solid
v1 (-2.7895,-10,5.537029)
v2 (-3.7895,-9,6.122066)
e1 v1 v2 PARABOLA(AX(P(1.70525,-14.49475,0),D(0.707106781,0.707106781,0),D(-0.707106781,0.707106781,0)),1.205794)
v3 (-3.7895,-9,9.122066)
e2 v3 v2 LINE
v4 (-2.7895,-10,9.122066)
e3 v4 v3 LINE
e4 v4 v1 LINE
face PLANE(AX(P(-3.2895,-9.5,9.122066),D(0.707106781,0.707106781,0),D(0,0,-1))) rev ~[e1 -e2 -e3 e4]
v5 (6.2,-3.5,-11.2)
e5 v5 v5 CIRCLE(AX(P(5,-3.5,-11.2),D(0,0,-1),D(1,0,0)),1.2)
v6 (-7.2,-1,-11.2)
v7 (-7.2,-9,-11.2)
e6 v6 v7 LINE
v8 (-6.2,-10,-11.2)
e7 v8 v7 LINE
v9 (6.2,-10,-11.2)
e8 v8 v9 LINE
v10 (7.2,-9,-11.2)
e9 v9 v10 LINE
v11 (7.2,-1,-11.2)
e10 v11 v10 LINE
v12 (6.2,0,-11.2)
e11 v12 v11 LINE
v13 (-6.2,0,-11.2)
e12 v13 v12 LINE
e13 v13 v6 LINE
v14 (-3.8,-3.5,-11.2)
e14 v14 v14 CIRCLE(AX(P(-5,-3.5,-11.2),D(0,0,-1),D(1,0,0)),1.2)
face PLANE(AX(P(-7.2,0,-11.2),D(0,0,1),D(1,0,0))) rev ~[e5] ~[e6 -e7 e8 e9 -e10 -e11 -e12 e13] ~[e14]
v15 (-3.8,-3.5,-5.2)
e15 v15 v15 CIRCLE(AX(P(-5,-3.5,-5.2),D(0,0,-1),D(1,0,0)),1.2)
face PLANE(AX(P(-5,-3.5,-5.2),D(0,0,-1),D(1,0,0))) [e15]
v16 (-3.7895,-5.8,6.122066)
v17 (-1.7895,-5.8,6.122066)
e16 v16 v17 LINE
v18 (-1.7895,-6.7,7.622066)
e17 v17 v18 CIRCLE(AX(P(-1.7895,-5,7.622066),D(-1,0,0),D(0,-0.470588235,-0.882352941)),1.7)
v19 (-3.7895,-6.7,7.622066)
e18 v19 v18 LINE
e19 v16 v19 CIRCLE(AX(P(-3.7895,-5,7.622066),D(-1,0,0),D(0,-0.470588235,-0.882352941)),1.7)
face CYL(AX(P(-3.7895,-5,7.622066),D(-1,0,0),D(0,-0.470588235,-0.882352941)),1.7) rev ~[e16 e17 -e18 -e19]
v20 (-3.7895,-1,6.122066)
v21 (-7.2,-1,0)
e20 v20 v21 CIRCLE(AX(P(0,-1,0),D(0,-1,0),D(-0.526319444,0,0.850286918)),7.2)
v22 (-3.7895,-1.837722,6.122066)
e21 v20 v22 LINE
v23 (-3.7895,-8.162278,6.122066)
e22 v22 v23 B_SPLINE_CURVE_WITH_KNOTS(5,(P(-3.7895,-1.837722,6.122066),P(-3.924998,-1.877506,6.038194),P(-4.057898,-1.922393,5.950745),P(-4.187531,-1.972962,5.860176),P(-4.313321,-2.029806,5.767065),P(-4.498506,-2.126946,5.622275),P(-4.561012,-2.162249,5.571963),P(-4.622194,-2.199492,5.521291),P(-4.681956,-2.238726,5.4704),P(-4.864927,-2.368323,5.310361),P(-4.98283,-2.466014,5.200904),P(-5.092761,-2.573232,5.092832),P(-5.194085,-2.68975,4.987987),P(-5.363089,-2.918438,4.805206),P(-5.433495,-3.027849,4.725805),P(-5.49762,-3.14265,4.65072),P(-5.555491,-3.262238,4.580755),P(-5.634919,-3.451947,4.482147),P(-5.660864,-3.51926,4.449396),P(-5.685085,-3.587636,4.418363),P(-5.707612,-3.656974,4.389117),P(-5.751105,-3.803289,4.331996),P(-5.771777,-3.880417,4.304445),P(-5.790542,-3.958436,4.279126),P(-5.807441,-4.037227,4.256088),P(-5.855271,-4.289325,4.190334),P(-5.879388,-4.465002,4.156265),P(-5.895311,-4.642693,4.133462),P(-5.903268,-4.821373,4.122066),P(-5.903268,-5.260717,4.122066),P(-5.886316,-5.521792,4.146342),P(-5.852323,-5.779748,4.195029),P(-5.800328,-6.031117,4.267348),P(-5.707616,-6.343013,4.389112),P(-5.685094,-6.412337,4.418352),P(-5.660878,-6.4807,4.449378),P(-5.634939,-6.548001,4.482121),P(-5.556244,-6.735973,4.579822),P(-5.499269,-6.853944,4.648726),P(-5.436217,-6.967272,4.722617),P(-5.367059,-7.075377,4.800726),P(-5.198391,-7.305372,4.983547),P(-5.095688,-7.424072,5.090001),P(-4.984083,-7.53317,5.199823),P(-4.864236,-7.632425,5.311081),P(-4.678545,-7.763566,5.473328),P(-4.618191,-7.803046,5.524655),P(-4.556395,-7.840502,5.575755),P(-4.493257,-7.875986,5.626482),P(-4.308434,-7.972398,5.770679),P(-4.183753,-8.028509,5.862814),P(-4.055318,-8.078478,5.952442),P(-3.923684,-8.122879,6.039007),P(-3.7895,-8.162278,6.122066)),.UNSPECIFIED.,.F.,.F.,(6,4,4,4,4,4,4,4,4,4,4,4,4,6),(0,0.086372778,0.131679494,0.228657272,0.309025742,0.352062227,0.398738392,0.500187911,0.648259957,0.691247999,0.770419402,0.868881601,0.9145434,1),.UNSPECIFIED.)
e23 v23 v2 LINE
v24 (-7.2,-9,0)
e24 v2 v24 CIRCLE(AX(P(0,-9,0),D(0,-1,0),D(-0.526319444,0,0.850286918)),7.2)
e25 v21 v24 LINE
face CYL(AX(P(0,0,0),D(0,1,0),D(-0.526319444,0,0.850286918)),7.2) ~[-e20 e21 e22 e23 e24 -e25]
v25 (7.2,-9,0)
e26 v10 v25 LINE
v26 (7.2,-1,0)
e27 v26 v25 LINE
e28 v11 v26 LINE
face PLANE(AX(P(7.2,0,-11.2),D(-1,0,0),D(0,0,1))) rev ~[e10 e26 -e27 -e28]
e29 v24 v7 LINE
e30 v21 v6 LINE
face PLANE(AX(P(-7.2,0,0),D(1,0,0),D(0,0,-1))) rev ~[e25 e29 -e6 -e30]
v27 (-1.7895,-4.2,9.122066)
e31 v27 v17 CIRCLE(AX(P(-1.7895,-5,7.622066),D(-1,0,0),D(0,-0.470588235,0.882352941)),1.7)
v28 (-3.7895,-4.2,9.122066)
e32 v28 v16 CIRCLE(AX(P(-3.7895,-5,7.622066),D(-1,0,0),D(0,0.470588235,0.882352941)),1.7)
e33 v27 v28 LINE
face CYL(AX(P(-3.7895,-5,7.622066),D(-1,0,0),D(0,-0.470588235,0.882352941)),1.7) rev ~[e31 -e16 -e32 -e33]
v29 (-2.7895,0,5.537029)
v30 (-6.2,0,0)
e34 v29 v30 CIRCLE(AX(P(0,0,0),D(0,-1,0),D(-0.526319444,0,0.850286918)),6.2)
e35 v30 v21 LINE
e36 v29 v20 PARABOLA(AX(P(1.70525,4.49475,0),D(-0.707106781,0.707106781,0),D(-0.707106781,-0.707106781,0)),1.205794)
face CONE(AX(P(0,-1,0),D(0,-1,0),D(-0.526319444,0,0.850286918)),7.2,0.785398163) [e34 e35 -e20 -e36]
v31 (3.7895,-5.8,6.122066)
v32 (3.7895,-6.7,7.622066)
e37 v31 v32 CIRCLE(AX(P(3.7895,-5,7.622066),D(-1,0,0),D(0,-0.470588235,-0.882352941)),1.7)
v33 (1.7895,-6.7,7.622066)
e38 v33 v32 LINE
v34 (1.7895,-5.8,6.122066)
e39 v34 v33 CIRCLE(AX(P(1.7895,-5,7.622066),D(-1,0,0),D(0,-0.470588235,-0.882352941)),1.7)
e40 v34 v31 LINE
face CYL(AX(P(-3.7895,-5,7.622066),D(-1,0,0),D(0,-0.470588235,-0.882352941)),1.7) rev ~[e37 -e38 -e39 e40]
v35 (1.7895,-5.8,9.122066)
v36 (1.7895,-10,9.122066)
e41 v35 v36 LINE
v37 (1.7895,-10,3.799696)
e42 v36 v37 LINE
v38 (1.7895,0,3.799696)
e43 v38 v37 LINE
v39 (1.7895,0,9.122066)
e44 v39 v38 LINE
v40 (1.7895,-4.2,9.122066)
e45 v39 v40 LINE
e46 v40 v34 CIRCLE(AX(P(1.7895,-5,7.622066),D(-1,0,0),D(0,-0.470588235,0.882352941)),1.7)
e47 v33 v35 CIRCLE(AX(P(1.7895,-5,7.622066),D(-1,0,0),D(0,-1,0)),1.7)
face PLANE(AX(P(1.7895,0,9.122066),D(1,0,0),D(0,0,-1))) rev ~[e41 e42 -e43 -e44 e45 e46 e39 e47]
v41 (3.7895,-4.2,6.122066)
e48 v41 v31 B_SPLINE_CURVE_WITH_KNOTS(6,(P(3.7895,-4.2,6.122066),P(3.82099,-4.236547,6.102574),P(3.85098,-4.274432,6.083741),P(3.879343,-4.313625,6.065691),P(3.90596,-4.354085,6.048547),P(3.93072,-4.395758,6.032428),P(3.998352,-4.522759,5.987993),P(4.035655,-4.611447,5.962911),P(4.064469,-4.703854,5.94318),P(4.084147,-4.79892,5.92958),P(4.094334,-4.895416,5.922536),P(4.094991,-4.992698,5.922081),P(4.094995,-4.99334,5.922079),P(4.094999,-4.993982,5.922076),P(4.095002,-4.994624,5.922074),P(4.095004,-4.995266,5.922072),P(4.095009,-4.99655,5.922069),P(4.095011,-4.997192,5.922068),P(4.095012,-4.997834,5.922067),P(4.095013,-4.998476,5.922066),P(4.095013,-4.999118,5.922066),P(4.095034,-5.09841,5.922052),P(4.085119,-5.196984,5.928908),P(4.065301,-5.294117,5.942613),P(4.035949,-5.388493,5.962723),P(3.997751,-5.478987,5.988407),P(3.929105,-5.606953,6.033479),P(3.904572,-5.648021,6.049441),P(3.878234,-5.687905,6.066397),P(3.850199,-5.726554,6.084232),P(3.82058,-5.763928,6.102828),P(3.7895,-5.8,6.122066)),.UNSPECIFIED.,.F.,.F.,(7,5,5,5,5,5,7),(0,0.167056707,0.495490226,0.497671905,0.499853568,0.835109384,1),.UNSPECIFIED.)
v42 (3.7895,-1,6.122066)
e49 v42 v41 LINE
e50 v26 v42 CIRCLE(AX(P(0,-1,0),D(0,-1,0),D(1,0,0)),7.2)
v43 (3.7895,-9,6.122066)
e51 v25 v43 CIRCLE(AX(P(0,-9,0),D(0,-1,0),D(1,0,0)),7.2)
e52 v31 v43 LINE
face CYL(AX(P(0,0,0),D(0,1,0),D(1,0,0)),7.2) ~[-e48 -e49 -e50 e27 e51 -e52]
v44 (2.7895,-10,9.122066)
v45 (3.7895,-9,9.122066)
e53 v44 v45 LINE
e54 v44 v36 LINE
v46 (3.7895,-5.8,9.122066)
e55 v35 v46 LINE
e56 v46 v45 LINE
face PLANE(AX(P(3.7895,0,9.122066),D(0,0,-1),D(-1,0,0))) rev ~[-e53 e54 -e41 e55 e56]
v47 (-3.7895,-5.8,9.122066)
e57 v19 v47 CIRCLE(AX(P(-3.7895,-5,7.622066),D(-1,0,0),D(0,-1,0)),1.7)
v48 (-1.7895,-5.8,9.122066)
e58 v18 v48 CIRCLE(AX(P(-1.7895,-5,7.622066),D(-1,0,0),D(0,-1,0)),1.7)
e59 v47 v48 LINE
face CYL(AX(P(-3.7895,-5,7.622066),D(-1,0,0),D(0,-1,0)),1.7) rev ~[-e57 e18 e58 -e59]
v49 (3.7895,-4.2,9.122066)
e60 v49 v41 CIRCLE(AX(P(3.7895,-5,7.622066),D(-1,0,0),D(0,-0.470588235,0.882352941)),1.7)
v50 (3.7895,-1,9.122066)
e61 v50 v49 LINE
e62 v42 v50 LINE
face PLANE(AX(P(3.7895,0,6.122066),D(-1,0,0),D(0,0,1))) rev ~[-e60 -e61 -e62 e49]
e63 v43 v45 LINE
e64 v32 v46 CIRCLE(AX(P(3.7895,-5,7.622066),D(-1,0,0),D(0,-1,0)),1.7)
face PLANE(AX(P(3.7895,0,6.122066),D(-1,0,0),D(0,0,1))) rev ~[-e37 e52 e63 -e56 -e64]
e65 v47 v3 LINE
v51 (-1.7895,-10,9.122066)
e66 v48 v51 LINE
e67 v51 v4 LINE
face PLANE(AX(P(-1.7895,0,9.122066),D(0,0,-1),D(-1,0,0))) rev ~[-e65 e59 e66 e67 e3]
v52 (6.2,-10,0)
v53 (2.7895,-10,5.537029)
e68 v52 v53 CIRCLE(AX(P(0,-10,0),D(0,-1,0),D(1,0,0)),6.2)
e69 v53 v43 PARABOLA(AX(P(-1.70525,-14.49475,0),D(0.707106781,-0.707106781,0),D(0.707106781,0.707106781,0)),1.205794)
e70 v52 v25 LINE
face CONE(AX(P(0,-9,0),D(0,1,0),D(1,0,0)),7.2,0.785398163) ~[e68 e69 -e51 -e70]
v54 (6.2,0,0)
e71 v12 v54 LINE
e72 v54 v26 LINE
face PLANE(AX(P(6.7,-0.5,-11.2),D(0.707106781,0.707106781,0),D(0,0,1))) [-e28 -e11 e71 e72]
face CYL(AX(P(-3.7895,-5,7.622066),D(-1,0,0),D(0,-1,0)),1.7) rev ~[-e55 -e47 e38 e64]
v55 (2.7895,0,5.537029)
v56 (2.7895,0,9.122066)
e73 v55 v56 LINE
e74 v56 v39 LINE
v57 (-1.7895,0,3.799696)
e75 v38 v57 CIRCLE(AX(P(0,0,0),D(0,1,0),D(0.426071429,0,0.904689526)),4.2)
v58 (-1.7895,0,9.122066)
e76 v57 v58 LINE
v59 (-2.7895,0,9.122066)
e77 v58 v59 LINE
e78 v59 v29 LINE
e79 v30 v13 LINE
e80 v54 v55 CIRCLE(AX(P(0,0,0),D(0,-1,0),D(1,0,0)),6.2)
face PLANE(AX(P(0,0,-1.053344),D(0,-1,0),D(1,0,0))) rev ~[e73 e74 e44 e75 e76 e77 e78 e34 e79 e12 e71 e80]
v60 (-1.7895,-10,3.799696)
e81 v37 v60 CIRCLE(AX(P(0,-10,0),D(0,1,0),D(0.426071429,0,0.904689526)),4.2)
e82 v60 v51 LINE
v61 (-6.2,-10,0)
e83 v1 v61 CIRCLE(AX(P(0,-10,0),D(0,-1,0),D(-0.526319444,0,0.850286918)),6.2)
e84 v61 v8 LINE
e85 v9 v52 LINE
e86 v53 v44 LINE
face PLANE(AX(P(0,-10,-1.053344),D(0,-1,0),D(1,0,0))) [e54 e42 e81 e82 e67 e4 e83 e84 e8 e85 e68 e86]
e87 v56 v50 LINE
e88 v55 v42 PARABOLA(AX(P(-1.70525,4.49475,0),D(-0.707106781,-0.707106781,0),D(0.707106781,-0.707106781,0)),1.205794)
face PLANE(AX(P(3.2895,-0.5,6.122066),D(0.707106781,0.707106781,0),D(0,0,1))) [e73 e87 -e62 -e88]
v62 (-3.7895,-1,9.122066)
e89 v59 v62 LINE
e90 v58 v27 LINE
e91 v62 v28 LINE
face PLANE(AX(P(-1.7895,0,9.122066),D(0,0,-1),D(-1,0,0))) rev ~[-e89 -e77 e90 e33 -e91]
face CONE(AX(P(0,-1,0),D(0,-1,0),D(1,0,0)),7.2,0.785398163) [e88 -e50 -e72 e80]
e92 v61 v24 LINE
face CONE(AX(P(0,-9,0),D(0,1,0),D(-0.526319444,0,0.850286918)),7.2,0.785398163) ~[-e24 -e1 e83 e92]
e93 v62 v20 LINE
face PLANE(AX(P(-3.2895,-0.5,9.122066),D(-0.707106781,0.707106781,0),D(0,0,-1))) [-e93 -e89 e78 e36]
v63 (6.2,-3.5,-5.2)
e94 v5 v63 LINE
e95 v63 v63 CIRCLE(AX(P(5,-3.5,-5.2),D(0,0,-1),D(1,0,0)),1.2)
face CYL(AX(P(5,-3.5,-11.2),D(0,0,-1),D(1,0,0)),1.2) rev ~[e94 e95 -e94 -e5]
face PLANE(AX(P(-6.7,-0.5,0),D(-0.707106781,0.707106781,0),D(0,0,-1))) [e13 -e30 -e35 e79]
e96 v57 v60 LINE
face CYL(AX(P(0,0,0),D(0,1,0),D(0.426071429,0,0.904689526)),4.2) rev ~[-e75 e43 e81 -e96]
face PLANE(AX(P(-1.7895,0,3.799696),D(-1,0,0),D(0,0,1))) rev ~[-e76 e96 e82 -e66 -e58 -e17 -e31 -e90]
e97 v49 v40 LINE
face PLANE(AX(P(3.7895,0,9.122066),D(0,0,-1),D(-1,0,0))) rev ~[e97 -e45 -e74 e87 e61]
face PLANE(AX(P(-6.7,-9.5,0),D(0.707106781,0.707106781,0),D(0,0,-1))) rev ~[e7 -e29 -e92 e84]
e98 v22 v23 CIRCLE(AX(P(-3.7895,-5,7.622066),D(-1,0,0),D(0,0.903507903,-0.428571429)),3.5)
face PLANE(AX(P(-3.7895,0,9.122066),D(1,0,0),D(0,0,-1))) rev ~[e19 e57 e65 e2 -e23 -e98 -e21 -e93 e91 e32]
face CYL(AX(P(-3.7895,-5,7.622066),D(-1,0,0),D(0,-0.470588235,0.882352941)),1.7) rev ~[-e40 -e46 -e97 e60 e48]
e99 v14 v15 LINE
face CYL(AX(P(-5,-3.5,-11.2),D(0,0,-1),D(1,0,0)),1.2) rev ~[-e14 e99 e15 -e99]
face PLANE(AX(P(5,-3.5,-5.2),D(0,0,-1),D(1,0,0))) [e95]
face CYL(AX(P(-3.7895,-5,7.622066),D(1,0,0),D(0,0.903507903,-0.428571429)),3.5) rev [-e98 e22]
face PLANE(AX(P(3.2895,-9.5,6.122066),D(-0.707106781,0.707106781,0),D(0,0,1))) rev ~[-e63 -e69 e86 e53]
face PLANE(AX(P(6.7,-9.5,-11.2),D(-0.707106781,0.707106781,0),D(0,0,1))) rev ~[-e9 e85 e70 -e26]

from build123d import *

# Parameters (mm, degrees)
F1_DEPTH = 10
F3_DEPTH = 4
F4_DEPTH = 20
F5_R     = 1.2
F6_DEPTH = 6
F7_SIZE  = 1


with BuildPart() as f1:
    # F0 (on Front) → F1 (new body)
    with BuildSketch(Plane.XZ):
        with BuildLine():
            ThreePointArc((1.7895, 3.7996960076), (0, -4.2), (-1.7895, 3.7996960076))
            Line((-1.7895, 3.7996960076), (-1.7895, 6.9740726803))
            Line((-1.7895, 6.9740726803), (-1.7895, 9.1220658074))
            Line((-1.7895, 9.1220658074), (-3.7895, 9.1220658074))
            Line((-3.7895, 9.1220658074), (-3.7895, 6.1220658074))
            ThreePointArc((-3.7895, 6.1220658074), (-6.2898489648, 3.5039691779), (-7.2, 0))
            Line((-7.2, 0), (-7.2, -11.2))
            Line((-7.2, -11.2), (7.2, -11.2))
            Line((7.2, -11.2), (7.2, 0))
            ThreePointArc((7.2, 0), (6.2898489648, 3.5039691779), (3.7895, 6.1220658074))
            Line((3.7895, 6.1220658074), (3.7895, 9.1220658074))
            Line((3.7895, 9.1220658074), (1.7895, 9.1220658074))
            Line((1.7895, 9.1220658074), (1.7895, 6.9740726803))
            Line((1.7895, 6.9740726803), (1.7895, 3.7996960076))
        make_face()
    extrude(amount=F1_DEPTH)

    # F2 (on face) → F3 (cut)
    with BuildSketch(Plane(origin=(-3.7895, 0, 0), x_dir=(0, -1, 0), z_dir=(-1, 0, 0))):
        with BuildLine():
            ThreePointArc((5.8, 9.1220658074), (6.4577379737, 8.4967085916), (6.7, 7.6220658074))
            ThreePointArc((6.7, 7.6220658074), (6.4577379737, 6.7474230232), (5.8, 6.1220658074))
            Line((5.8, 6.1220658074), (8.1622776602, 6.1220658074))
            ThreePointArc((8.1622776602, 6.1220658074), (8.4145257219, 6.8532913966), (8.5, 7.6220658074))
            ThreePointArc((8.5, 7.6220658074), (8.4145257219, 8.3908402182), (8.1622776602, 9.1220658074))
            Line((8.1622776602, 9.1220658074), (5.8, 9.1220658074))
        make_face()
        with BuildLine():
            ThreePointArc((4.2, 9.1220658074), (5, 9.3220658074), (5.8, 9.1220658074))
            Line((5.8, 9.1220658074), (8.1622776602, 9.1220658074))
            ThreePointArc((8.1622776602, 9.1220658074), (5, 11.1220658074), (1.8377223398, 9.1220658074))
            Line((1.8377223398, 9.1220658074), (4.2, 9.1220658074))
        make_face()
        with BuildLine():
            Line((8.1622776602, 6.1220658074), (5.8, 6.1220658074))
            ThreePointArc((5.8, 6.1220658074), (5, 5.9220658074), (4.2, 6.1220658074))
            Line((4.2, 6.1220658074), (1.8377223398, 6.1220658074))
            ThreePointArc((1.8377223398, 6.1220658074), (5, 4.1220658074), (8.1622776602, 6.1220658074))
        make_face()
        with BuildLine():
            ThreePointArc((4.2, 6.1220658074), (3.3, 7.6220658074), (4.2, 9.1220658074))
            Line((4.2, 9.1220658074), (1.8377223398, 9.1220658074))
            ThreePointArc((1.8377223398, 9.1220658074), (1.5, 7.6220658074), (1.8377223398, 6.1220658074))
            Line((1.8377223398, 6.1220658074), (4.2, 6.1220658074))
        make_face()
    extrude(amount=F3_DEPTH, mode=Mode.SUBTRACT)

    # F2 (on face) → F4 (cut, symmetric)
    with BuildSketch(Plane(origin=(-3.7895, 0, 0), x_dir=(0, -1, 0), z_dir=(-1, 0, 0))):
        with BuildLine():
            Line((4.2, 9.1220658074), (5.8, 9.1220658074))
            ThreePointArc((5.8, 9.1220658074), (5, 9.3220658074), (4.2, 9.1220658074))
        make_face()
        with BuildLine():
            ThreePointArc((5.8, 6.1220658074), (6.4577379737, 6.7474230232), (6.7, 7.6220658074))
            ThreePointArc((6.7, 7.6220658074), (6.4577379737, 8.4967085916), (5.8, 9.1220658074))
            Line((5.8, 9.1220658074), (4.2, 9.1220658074))
            ThreePointArc((4.2, 9.1220658074), (3.3, 7.6220658074), (4.2, 6.1220658074))
            Line((4.2, 6.1220658074), (5.8, 6.1220658074))
        make_face()
        with BuildLine():
            ThreePointArc((4.2, 6.1220658074), (5, 5.9220658074), (5.8, 6.1220658074))
            Line((5.8, 6.1220658074), (4.2, 6.1220658074))
        make_face()
    extrude(amount=F4_DEPTH, both=True, mode=Mode.SUBTRACT)

    # F5 (on face) → F6 (cut)
    with BuildSketch(Plane(origin=(0, 0, -11.2), x_dir=(1, 0, 0), z_dir=(0, 0, -1))):
        with Locations((-5, 3.5)):
            Circle(F5_R)
        with Locations((5, 3.5)):
            Circle(F5_R)
    extrude(amount=-F6_DEPTH, mode=Mode.SUBTRACT)

    # F7
    f7_edges = [f1.edges().sort_by_distance(p)[0] for p in [
        (7.2, 0, -5.6),
        (7.2, -10, -5.6),
        (-7.2, -10, -5.6),
        (-7.2, 0, -5.6),
        (3.7895, -10, 7.622066),
        (3.7895, 0, 7.622066),
        (-3.7895, -10, 7.622066),
        (-3.7895, 0, 7.622066),
        (-6.289849, 0, 3.503969),
        (6.289849, 0, 3.503969),
        (-6.289849, -10, 3.503969),
        (6.289849, -10, 3.503969),
    ]]
    chamfer(f7_edges, length=F7_SIZE)


solid = f1.part
